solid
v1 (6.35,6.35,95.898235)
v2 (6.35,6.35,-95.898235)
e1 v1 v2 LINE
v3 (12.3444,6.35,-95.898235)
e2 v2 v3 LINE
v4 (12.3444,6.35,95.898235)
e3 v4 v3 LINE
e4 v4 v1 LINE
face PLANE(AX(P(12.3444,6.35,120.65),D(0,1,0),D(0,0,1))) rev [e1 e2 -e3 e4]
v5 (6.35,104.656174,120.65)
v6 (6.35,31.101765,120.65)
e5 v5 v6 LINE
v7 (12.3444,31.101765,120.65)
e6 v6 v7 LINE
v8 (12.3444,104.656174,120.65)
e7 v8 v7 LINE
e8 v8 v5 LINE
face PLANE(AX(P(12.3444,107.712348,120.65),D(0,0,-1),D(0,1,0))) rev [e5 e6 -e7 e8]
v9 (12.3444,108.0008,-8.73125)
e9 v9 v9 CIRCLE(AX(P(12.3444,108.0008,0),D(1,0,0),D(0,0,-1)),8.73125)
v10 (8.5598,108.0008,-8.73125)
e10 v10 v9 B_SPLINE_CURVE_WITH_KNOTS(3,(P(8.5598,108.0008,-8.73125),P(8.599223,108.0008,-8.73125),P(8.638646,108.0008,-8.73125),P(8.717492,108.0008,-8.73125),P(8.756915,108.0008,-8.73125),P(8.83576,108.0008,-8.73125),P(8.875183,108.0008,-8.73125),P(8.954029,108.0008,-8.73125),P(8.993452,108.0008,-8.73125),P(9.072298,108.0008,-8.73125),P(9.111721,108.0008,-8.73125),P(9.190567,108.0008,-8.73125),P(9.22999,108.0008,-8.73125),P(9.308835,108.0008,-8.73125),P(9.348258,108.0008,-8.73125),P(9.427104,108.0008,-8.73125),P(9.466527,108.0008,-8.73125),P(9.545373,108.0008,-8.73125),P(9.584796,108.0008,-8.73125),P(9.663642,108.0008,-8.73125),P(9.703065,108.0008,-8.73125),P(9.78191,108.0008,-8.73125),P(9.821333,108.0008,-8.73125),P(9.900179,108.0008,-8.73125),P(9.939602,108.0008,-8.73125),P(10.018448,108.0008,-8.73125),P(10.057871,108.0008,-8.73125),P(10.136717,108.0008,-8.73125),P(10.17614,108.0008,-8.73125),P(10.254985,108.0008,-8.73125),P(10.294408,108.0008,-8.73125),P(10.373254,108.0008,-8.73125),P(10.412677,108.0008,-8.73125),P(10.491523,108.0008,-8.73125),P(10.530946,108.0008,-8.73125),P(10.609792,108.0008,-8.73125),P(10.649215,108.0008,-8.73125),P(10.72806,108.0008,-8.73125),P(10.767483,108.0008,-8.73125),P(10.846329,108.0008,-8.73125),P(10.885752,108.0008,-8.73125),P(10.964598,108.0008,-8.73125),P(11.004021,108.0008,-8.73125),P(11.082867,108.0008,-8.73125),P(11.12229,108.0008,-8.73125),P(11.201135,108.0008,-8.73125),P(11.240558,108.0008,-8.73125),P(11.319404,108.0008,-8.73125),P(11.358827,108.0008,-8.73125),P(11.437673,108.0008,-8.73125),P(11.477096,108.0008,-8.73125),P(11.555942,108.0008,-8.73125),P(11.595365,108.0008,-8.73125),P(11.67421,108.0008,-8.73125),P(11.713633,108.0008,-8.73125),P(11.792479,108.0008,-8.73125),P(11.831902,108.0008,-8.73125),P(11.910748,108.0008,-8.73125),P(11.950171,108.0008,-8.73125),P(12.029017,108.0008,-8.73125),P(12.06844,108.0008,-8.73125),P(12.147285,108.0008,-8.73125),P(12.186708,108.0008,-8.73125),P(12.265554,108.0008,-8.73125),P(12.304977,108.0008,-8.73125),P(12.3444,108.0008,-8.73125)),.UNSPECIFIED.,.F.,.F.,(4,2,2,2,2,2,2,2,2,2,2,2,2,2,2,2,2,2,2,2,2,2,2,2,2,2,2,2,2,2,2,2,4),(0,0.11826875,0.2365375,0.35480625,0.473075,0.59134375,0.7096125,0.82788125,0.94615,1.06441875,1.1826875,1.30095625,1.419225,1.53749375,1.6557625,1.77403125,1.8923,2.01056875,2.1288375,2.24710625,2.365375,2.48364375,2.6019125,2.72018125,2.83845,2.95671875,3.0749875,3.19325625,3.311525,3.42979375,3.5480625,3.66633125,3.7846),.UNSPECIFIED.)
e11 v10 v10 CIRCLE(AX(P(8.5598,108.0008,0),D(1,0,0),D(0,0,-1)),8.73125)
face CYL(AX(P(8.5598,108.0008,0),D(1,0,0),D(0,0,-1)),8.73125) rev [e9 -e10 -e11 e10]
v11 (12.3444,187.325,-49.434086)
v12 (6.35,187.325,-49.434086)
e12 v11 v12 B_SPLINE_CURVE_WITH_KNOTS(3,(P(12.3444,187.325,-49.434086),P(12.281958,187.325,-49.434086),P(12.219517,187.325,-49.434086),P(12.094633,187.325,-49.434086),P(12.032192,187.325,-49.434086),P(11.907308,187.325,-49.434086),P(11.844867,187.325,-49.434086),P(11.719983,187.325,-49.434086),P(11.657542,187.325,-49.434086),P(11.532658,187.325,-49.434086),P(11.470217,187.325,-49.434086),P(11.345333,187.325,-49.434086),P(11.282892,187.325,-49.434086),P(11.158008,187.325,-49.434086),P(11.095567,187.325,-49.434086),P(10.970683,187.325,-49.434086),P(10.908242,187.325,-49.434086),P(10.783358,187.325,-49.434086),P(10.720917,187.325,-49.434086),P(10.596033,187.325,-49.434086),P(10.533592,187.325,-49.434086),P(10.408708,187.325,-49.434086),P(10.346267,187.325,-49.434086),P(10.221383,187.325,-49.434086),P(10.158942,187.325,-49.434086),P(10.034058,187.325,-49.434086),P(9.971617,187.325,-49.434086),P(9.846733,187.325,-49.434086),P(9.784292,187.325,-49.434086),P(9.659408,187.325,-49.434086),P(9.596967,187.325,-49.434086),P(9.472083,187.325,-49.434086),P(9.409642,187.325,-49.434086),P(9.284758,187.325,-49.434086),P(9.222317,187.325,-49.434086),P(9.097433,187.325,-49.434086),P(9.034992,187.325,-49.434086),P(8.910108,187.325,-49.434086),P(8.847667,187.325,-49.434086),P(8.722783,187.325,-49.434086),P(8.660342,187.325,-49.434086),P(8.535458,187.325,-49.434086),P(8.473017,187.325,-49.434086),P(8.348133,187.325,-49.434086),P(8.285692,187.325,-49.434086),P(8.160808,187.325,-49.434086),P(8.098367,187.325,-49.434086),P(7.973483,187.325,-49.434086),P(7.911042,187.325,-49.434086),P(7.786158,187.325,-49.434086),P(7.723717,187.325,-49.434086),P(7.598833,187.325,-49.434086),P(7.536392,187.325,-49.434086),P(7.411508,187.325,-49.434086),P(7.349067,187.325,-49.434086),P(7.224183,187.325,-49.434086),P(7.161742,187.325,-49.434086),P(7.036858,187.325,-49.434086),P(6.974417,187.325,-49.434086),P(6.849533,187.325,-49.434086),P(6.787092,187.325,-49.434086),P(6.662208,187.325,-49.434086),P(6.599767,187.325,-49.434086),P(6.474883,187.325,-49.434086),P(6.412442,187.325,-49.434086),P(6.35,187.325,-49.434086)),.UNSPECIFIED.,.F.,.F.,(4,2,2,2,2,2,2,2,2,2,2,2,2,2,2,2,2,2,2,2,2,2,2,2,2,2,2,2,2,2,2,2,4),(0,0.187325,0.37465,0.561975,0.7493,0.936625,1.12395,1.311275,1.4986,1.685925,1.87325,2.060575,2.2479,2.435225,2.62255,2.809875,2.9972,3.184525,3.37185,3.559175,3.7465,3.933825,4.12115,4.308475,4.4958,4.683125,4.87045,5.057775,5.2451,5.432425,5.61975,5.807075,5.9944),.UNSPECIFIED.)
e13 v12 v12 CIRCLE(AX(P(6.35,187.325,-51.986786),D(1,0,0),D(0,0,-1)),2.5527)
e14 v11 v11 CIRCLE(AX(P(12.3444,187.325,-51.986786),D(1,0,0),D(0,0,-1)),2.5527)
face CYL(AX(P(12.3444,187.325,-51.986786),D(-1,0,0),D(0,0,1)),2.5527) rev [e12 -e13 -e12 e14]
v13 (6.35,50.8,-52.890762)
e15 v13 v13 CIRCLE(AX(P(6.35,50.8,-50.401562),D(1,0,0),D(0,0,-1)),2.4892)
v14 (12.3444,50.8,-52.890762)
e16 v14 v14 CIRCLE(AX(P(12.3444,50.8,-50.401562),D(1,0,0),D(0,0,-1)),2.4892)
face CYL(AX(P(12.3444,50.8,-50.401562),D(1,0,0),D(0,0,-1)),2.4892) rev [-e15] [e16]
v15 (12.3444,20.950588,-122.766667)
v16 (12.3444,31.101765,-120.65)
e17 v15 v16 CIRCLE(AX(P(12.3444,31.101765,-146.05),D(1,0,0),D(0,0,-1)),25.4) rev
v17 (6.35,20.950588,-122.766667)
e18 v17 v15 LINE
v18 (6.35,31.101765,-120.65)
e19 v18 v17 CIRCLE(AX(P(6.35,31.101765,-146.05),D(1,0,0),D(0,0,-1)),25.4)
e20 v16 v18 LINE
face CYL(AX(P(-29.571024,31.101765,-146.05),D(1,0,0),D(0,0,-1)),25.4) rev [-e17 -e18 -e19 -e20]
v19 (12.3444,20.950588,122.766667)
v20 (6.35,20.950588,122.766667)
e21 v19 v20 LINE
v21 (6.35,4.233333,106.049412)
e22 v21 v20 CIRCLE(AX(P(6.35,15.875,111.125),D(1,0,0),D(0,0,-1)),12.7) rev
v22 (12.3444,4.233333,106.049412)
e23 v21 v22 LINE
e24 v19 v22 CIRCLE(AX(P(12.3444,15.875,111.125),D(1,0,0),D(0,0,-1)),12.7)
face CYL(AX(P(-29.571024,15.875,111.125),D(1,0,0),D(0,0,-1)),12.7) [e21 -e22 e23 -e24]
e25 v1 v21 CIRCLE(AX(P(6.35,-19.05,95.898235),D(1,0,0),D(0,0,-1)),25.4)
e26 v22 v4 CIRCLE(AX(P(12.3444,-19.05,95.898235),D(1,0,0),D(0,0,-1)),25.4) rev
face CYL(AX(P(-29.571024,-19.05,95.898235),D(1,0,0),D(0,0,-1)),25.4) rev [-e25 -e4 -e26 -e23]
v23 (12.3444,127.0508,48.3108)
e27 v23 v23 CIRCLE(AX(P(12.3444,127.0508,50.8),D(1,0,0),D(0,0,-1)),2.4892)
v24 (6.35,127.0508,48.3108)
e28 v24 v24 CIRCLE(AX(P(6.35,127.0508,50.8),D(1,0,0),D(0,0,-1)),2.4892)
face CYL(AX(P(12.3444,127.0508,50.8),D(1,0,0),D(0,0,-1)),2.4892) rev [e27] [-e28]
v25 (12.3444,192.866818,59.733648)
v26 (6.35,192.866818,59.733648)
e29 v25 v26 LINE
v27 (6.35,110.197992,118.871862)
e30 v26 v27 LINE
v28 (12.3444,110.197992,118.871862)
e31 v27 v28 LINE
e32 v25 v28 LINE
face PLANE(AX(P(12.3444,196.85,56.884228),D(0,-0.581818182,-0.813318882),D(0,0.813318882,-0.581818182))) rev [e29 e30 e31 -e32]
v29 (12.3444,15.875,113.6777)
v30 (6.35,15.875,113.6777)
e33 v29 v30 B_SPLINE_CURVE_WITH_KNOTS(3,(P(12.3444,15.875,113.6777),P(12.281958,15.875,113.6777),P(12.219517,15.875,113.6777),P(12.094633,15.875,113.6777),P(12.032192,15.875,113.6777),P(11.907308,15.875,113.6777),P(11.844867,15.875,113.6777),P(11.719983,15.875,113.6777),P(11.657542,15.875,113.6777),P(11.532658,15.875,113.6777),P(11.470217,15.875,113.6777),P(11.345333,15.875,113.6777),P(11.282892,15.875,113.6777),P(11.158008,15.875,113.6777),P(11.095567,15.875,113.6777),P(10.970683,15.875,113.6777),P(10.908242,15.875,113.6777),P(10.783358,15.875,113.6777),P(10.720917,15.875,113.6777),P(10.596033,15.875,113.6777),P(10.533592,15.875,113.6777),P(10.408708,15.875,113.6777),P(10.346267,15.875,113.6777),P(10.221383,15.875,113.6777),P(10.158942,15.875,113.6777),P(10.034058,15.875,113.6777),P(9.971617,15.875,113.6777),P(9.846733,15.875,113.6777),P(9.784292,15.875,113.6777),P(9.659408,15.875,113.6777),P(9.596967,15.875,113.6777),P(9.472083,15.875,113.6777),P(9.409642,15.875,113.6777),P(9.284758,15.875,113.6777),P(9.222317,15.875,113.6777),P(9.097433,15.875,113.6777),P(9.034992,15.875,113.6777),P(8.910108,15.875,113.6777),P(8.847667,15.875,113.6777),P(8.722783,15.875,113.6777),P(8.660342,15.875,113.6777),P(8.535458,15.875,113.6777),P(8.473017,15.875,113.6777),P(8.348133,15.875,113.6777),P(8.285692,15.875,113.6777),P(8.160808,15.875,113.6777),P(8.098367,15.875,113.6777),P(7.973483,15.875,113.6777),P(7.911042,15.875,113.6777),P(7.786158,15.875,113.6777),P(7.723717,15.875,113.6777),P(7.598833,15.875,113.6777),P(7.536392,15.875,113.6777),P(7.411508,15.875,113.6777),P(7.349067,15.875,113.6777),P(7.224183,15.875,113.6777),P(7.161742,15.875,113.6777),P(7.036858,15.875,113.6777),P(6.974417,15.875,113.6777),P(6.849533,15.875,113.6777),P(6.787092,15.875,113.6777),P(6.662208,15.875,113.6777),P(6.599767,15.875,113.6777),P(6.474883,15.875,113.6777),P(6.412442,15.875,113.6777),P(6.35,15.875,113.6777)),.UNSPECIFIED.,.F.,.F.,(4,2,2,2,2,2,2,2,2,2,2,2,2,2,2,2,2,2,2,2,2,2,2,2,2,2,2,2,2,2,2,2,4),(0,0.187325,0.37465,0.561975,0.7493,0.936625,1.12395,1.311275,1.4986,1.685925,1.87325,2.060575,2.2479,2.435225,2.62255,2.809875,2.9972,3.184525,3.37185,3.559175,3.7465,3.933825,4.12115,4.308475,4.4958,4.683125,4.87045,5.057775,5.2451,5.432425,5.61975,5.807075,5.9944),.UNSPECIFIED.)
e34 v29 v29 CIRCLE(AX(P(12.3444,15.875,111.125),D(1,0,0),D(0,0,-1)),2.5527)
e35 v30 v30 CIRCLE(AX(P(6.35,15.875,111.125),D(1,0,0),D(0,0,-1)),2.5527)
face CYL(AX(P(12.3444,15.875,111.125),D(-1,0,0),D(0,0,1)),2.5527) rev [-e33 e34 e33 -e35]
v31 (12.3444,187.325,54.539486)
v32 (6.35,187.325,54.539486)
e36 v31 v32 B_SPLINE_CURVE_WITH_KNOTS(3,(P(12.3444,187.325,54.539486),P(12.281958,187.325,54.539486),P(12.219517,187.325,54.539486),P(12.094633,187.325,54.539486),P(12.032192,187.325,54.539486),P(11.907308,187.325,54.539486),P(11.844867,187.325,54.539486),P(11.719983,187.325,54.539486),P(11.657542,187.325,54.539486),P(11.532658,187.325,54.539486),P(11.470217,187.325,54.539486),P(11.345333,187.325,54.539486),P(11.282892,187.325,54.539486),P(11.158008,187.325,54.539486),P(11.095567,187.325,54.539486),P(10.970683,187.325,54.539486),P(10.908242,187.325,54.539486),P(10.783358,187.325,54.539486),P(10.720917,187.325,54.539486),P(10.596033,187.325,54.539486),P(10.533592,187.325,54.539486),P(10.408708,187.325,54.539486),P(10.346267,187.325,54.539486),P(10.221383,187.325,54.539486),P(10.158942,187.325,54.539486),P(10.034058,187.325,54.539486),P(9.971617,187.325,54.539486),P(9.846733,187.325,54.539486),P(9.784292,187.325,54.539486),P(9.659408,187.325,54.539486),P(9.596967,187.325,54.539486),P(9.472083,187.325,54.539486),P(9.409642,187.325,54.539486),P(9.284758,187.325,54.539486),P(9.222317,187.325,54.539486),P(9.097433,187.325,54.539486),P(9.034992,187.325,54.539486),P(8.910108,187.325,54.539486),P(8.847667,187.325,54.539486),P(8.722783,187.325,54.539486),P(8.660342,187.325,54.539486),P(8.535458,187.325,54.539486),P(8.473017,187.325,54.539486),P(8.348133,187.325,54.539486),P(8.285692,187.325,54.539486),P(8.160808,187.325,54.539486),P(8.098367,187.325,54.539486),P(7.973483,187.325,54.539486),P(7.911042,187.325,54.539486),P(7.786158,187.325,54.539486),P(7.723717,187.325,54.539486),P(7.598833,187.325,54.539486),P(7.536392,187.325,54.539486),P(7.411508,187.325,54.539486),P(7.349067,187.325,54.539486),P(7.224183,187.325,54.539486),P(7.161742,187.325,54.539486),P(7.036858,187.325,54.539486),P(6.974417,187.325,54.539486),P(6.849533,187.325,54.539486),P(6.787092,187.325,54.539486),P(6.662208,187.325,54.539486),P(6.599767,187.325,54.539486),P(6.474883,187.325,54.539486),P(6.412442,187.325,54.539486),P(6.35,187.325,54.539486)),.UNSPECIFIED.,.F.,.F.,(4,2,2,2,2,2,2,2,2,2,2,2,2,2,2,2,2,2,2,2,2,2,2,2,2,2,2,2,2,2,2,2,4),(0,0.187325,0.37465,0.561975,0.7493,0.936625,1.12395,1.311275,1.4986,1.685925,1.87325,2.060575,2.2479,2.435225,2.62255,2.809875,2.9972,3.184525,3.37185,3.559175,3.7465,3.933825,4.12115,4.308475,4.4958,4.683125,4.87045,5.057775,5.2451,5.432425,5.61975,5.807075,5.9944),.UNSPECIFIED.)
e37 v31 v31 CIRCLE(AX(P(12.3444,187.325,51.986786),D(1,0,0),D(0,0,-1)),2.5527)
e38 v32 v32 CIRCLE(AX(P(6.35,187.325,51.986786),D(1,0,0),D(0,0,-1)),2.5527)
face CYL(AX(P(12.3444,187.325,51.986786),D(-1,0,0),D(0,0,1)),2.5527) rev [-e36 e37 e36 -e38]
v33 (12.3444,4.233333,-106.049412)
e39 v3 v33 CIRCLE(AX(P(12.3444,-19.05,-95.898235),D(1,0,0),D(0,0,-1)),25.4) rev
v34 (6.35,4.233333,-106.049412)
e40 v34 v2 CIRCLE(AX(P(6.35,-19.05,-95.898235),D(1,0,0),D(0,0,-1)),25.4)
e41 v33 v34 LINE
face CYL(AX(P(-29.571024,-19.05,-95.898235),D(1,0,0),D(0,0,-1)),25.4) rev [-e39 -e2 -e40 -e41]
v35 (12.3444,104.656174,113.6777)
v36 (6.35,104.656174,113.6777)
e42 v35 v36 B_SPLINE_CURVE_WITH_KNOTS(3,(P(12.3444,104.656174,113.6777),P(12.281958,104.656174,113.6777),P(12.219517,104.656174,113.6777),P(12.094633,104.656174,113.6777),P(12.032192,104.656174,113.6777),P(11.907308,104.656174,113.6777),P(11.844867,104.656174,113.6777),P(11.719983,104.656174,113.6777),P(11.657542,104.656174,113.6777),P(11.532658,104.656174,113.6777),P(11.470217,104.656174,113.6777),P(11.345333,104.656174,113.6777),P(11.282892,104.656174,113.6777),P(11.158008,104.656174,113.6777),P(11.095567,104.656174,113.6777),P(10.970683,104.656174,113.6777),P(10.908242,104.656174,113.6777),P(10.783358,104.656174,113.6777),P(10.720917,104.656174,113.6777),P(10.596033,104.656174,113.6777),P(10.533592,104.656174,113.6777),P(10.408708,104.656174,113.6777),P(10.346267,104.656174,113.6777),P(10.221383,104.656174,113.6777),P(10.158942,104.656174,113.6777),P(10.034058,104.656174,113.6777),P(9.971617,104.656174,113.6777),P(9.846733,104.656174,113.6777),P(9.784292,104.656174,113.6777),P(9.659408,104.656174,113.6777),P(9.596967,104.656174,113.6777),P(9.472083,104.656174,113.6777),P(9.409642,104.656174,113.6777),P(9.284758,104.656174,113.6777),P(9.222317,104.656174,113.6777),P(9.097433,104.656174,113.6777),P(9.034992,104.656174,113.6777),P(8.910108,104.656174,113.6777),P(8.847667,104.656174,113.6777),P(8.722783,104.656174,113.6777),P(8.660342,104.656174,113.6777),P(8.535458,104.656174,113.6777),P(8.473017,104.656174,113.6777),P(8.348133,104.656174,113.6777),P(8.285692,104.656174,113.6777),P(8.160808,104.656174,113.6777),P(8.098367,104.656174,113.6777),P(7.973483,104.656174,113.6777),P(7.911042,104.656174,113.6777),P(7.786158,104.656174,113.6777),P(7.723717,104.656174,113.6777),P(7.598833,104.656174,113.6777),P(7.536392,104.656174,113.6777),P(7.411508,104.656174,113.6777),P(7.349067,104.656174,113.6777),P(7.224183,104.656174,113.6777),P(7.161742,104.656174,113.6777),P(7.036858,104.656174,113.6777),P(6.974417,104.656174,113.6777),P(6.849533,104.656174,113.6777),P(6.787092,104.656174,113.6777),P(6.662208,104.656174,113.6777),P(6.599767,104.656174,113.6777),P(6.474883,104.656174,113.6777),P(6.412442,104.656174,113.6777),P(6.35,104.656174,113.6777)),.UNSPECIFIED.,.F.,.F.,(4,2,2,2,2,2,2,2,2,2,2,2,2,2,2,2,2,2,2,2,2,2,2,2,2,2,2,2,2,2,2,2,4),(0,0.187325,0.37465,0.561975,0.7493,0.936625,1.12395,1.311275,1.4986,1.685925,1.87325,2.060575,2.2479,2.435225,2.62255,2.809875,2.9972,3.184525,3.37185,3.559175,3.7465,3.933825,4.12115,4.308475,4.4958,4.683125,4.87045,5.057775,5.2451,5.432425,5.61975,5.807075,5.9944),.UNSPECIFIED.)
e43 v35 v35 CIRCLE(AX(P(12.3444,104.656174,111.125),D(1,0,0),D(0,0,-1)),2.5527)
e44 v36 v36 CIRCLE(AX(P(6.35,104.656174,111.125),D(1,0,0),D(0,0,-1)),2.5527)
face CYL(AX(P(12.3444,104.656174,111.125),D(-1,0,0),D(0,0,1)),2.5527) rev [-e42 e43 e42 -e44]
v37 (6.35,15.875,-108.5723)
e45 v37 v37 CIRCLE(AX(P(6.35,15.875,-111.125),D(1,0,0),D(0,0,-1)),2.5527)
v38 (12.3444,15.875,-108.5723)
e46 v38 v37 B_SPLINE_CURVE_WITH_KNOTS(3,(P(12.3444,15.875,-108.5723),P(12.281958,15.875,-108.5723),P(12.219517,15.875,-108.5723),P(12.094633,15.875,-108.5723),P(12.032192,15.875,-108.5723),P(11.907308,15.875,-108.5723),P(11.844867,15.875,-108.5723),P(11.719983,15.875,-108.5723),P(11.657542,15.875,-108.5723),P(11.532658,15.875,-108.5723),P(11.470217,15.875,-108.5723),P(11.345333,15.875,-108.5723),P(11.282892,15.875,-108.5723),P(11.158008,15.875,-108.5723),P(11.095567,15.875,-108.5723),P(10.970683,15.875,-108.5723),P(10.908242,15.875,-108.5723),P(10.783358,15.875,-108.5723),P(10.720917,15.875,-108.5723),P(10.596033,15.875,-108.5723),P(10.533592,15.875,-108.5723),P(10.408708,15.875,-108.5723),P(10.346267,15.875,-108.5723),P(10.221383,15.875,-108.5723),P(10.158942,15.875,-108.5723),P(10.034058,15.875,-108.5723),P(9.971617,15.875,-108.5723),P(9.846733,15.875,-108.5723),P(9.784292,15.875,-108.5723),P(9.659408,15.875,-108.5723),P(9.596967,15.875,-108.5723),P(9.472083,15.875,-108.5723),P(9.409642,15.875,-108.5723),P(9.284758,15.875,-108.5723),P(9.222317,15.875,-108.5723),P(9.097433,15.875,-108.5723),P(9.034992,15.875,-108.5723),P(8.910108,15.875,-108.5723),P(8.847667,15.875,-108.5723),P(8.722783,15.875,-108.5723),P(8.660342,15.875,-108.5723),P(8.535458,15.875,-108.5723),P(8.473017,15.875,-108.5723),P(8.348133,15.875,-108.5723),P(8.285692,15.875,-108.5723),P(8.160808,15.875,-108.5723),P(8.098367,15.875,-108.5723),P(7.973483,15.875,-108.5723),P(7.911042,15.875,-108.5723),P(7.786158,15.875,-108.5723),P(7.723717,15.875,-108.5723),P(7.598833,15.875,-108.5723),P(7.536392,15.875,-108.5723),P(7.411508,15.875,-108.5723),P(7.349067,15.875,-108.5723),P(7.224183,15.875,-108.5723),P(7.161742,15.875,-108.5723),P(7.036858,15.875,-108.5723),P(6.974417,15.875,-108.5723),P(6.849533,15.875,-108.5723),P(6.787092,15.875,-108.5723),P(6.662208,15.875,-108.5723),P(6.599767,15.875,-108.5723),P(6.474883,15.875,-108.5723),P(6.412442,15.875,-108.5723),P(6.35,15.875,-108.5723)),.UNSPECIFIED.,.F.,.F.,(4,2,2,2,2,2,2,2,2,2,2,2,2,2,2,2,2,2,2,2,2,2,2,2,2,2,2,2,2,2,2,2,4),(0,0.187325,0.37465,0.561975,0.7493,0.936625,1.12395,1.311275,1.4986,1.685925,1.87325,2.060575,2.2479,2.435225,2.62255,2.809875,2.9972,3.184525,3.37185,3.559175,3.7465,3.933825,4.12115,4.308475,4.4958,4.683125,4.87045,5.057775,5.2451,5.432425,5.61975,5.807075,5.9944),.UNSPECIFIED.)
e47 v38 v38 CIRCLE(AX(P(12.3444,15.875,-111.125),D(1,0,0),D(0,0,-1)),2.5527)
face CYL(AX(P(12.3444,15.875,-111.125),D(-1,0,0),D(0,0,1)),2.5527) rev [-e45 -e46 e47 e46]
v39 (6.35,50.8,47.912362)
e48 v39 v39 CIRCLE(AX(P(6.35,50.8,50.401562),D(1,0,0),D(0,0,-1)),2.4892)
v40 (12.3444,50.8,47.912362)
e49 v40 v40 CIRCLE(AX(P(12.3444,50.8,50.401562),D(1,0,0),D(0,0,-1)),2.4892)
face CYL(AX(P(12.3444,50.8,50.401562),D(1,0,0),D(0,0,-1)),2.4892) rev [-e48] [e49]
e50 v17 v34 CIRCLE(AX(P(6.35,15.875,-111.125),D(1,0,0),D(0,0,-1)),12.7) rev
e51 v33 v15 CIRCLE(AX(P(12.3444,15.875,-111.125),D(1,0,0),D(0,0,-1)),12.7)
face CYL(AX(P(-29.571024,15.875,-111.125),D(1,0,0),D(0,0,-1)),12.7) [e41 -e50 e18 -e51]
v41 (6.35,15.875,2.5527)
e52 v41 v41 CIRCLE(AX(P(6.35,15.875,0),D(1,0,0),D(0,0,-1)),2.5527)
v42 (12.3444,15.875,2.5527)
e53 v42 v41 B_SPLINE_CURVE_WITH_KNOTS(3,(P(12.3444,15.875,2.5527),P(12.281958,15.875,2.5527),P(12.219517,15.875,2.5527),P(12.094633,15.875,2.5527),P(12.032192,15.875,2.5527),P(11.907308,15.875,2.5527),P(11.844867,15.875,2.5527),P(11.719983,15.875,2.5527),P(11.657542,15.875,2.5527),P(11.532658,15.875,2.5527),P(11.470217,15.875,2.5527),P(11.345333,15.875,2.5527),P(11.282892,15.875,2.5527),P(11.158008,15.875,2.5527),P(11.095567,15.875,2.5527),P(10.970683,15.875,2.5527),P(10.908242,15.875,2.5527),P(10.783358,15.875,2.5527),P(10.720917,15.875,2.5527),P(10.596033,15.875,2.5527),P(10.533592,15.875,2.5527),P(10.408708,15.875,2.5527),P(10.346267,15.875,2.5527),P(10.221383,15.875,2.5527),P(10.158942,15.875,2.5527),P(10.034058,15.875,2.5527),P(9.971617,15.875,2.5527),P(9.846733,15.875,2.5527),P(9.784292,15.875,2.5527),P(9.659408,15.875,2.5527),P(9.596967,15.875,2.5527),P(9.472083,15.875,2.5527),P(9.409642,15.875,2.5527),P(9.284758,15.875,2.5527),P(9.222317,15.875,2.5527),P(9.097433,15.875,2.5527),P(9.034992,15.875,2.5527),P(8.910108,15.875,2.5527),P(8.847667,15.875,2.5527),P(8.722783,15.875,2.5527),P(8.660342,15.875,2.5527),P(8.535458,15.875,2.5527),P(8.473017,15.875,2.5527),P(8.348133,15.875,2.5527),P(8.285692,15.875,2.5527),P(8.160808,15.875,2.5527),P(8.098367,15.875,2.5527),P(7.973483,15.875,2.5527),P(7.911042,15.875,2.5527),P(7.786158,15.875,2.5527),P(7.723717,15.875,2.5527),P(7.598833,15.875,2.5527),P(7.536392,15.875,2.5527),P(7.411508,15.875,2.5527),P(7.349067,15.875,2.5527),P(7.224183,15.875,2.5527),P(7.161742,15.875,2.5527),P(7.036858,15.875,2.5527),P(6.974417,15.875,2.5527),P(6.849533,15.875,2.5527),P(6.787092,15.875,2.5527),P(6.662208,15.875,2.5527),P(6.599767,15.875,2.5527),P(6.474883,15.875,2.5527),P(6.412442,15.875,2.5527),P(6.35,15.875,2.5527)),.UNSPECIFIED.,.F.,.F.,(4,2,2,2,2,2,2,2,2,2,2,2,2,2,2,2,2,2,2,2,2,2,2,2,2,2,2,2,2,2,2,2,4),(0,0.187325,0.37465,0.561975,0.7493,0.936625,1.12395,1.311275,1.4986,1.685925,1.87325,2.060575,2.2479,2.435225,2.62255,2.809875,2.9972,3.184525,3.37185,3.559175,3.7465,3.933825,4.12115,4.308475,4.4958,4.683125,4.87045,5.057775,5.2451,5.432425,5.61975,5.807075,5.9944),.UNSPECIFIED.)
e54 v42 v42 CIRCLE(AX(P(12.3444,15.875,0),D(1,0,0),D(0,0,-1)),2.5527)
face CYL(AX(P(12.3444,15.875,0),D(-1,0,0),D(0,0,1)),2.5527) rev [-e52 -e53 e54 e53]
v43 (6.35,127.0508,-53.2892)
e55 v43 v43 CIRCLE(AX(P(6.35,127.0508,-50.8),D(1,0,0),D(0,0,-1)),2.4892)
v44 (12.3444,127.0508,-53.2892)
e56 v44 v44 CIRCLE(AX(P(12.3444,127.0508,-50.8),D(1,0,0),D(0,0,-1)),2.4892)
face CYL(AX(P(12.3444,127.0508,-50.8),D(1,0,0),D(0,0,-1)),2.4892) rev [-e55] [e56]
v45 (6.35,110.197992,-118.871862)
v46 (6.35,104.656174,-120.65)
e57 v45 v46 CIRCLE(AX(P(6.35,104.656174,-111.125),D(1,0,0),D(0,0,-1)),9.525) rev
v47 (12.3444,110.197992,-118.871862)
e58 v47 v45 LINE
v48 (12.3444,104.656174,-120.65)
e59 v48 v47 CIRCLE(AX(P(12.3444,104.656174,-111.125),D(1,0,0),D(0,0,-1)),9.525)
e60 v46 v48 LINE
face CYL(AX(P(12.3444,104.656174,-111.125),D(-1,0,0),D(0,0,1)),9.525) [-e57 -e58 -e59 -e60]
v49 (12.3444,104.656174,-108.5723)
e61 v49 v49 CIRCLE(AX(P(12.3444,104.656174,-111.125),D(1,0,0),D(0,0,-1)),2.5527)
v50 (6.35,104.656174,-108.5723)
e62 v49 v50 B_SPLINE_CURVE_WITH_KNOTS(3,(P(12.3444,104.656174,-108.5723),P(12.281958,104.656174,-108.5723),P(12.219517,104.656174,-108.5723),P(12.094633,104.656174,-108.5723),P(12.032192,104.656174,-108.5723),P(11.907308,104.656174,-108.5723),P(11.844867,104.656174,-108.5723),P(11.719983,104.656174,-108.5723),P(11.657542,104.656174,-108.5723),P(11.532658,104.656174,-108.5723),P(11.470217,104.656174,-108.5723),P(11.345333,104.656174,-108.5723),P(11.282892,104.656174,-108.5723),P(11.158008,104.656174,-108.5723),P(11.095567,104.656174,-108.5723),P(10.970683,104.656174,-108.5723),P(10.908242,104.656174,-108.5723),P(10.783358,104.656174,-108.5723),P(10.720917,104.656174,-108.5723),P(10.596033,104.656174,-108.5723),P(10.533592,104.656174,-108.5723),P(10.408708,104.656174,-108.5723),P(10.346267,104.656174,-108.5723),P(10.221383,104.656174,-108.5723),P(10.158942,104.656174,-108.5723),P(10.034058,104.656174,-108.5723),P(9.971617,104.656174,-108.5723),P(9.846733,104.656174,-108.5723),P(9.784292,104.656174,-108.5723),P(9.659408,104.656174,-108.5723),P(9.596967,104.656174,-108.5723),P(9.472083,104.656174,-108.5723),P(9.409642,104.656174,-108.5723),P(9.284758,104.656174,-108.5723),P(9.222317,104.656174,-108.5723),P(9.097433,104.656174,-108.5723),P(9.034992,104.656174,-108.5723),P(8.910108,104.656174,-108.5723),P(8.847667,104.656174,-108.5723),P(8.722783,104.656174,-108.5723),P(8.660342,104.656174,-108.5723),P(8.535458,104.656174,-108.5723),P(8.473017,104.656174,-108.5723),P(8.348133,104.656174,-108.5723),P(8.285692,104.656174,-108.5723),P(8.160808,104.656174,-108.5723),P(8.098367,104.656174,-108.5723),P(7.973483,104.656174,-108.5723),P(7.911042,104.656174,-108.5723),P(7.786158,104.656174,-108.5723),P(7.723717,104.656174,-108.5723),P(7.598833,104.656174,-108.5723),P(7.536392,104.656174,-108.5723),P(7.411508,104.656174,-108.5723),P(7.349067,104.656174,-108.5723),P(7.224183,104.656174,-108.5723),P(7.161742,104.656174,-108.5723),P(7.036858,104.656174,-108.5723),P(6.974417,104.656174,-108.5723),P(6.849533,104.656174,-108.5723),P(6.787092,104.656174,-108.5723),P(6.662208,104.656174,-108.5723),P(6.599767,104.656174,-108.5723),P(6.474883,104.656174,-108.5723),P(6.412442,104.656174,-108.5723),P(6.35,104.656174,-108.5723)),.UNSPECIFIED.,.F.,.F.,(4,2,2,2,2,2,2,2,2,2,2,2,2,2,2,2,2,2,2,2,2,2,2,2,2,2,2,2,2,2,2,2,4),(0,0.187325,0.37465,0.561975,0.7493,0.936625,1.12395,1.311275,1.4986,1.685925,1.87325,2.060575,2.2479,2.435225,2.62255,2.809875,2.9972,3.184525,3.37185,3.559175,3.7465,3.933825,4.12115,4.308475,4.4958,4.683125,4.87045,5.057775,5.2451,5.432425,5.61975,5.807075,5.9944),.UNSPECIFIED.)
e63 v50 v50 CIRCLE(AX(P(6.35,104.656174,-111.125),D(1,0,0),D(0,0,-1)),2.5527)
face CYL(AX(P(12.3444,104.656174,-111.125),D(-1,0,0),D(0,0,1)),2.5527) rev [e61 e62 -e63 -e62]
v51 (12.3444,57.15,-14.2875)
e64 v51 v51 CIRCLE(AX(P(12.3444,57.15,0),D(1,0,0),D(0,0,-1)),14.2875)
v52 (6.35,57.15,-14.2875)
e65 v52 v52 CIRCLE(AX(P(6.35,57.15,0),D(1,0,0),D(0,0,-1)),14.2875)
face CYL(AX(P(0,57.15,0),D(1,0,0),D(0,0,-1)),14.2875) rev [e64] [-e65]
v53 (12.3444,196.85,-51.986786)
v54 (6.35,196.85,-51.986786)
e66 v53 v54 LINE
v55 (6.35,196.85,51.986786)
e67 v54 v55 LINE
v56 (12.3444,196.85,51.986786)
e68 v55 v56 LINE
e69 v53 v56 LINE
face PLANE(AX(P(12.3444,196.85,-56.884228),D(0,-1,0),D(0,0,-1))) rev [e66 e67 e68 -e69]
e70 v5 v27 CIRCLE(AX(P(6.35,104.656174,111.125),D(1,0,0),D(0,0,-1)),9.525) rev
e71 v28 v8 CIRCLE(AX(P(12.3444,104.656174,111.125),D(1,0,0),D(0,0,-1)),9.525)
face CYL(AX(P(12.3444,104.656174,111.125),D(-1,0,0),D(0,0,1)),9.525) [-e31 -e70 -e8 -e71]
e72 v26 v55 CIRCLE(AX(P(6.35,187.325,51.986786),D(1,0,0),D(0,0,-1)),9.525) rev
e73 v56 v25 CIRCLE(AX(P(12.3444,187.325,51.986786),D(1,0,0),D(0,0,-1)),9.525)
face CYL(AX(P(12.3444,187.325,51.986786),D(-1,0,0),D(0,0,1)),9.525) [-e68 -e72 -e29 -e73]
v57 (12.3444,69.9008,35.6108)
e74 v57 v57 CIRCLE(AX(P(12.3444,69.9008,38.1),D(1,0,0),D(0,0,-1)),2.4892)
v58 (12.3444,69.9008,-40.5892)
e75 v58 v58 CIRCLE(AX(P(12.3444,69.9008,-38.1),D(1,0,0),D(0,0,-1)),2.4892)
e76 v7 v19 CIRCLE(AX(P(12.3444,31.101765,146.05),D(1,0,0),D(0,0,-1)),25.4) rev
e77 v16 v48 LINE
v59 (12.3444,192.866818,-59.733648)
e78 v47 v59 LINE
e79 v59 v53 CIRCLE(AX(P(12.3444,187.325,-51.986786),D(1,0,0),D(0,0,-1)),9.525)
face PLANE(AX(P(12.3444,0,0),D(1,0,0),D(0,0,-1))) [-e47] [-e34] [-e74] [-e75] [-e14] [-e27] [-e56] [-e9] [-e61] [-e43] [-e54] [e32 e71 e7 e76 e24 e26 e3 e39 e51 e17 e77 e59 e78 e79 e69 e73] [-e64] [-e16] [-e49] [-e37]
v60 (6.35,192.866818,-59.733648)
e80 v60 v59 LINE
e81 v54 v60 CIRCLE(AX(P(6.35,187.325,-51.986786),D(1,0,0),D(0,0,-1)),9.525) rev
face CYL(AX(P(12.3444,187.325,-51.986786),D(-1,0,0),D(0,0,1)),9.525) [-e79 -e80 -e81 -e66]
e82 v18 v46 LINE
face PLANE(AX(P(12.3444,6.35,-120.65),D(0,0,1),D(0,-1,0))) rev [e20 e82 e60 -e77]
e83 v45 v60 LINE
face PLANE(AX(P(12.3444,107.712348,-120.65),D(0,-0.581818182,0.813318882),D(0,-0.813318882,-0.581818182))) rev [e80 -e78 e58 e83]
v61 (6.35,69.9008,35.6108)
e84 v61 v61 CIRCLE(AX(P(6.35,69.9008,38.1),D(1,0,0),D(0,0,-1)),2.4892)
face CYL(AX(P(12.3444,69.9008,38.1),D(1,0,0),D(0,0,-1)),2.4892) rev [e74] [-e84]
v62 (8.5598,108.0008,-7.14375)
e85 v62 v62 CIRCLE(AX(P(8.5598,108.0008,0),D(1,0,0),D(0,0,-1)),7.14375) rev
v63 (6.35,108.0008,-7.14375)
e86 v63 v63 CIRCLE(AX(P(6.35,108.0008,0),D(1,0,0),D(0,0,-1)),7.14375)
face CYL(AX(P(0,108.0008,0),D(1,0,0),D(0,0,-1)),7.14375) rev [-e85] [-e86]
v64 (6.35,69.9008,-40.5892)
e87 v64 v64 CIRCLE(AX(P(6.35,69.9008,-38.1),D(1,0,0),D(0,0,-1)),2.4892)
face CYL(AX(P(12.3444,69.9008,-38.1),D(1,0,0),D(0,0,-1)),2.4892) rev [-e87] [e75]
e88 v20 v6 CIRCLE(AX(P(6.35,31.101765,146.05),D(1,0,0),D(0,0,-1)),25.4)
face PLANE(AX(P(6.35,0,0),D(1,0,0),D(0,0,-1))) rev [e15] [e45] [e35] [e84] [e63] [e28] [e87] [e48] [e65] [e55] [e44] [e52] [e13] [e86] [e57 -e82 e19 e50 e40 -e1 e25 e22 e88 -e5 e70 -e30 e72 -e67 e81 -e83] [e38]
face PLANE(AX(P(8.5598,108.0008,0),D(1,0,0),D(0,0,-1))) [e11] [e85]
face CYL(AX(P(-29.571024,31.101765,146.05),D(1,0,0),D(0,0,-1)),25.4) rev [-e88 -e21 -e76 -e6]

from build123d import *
from build123d.topology import SkipClean

# Parameters (mm, degrees)
ANGLEDBALLAST_DECKFRONT_OUTLINE_R = 2.5527
ANGLEDBALLAST_DECKFRONT_DEPTH     = 6.35
SKETCH1_R                         = 2.5527
BOSS_EXTRUDE1_DEPTH               = 5.9944
SKETCH2_R                         = 7.14375
SKETCH2_R_2                       = 14.2875
CUT_EXTRUDE1_DEPTH                = 344.885135927
F_10_CLEARANCE_HOLE1_AT_2_COUNT   = 2
F_10_CLEARANCE_HOLE1_AT_2_PITCH   = 58.544107304
F_10_CLEARANCE_HOLE1_AT_3_COUNT   = 2
F_10_CLEARANCE_HOLE1_AT_3_PITCH   = 105.685062805
F_10_CLEARANCE_HOLE1_AT_4_COUNT   = 2
F_10_CLEARANCE_HOLE1_AT_4_PITCH   = 76.2
F_10_CLEARANCE_HOLE1_AT_5_COUNT   = 2
F_10_CLEARANCE_HOLE1_AT_5_PITCH   = 90.539312574
F_10_CLEARANCE_HOLE1_AT_6_COUNT   = 2
F_10_CLEARANCE_HOLE1_AT_6_PITCH   = 22.719352983
SKETCH6_R                         = 12.7
SKETCH6_R_2                       = 2.5527
BOSS_EXTRUDE2_DEPTH               = 5.9944
FILLET1_R                         = 25.4
CUT_EXTRUDE2_DEPTH                = 233.633802265
FILLET2_R                         = 9.525
SKETCH8_R                         = 8.73125
CUT_EXTRUDE3_DEPTH                = 3.7846


# Read off the part's stored shape, not the designer's step: Surface Bodies1
with BuildPart() as part:
    # AngledBallast_DeckFront outline → AngledBallast_DeckFront (new body)
    with BuildSketch(Plane.YZ):
        Polygon((227.241295543, 95.25), (0, 257.81), (0, -257.81), (227.241295543, -95.25), align=None)
        with Locations((15.875, -111.125)):
            Circle(ANGLEDBALLAST_DECKFRONT_OUTLINE_R, mode=Mode.SUBTRACT)
        with Locations((104.656174089, -111.125)):
            Circle(ANGLEDBALLAST_DECKFRONT_OUTLINE_R, mode=Mode.SUBTRACT)
        with Locations((187.325, -51.986786112)):
            Circle(ANGLEDBALLAST_DECKFRONT_OUTLINE_R, mode=Mode.SUBTRACT)
        with Locations((15.875, 0)):
            Circle(ANGLEDBALLAST_DECKFRONT_OUTLINE_R, mode=Mode.SUBTRACT)
        with Locations((15.875, 111.125)):
            Circle(ANGLEDBALLAST_DECKFRONT_OUTLINE_R, mode=Mode.SUBTRACT)
        Polygon((101.6, -101.6), (25.4, -101.6), (25.4, 101.6), (101.6, 101.6), (177.8, 47.089344398), (177.8, -47.089344398), align=None, mode=Mode.SUBTRACT)
        with Locations((104.656174089, 111.125)):
            Circle(ANGLEDBALLAST_DECKFRONT_OUTLINE_R, mode=Mode.SUBTRACT)
        with Locations((187.325, 51.986786112)):
            Circle(ANGLEDBALLAST_DECKFRONT_OUTLINE_R, mode=Mode.SUBTRACT)
    extrude(amount=ANGLEDBALLAST_DECKFRONT_DEPTH)


with BuildPart() as body_2:
    # Sketch1 → Boss-Extrude1 (new body)
    with BuildSketch(Plane(origin=(6.35, 0, 0), x_dir=(0, 0, -1), z_dir=(1, 0, 0))):
        Polygon((120.65, 107.712348179), (56.884227826, 196.85), (-56.884227826, 196.85), (-120.65, 107.712348179), (-120.65, 6.35), (120.65, 6.35), align=None)
        with Locations(Location((51.986786112, 187.325, 0), (0, 0, 180))):
            Circle(SKETCH1_R, mode=Mode.SUBTRACT)
        with Locations(Location((111.125, 104.656174089, 0), (0, 0, 180))):
            Circle(SKETCH1_R, mode=Mode.SUBTRACT)
        with Locations(Location((0, 15.875, 0), (0, 0, 180))):
            Circle(SKETCH1_R, mode=Mode.SUBTRACT)
        with Locations(Location((111.125, 15.875, 0), (0, 0, 180))):
            Circle(SKETCH1_R, mode=Mode.SUBTRACT)
        with Locations(Location((-111.125, 15.875, 0), (0, 0, 180))):
            Circle(SKETCH1_R, mode=Mode.SUBTRACT)
        with Locations(Location((-111.125, 104.656174089, 0), (0, 0, 180))):
            Circle(SKETCH1_R, mode=Mode.SUBTRACT)
        with Locations(Location((-51.986786112, 187.325, 0), (0, 0, 180))):
            Circle(SKETCH1_R, mode=Mode.SUBTRACT)
    extrude(amount=BOSS_EXTRUDE1_DEPTH)

    # Sketch2 → Cut-Extrude1 (cut, through all)
    with BuildSketch(Plane(origin=(12.3444, 0, 0), x_dir=(0, 0, -1), z_dir=(1, 0, 0))):
        with Locations((0, 108.0008)):
            Circle(SKETCH2_R)
        with Locations((0, 57.15)):
            Circle(SKETCH2_R_2)
    extrude(amount=-CUT_EXTRUDE1_DEPTH, mode=Mode.SUBTRACT)

    # Sketch5 → #10 Clearance Hole1 (revolve, cut)
    with BuildSketch(Plane(origin=(12.3444, 69.9008, -38.1), x_dir=(0, 0, -1), z_dir=(0, 1, 0))):
        Polygon((0, 0), (0, 13.433662253), (2.4892, 11.938), (2.4892, 0), align=None)
    f_10_clearance_hole1 = revolve(axis=Axis((18.6944, 69.9008, -38.1), (-1, 0, 0)), mode=Mode.SUBTRACT)

    # #10 Clearance Hole1 at 2: #10 Clearance Hole1 ×2
    with Locations(*[Vector(0, 0.9761870601839528, -0.2169304578186562) * (i * F_10_CLEARANCE_HOLE1_AT_2_PITCH) for i in range(1, F_10_CLEARANCE_HOLE1_AT_2_COUNT)]):
        add(f_10_clearance_hole1, mode=Mode.SUBTRACT)

    # #10 Clearance Hole1 at 3: #10 Clearance Hole1 ×2
    with Locations(*[Vector(0, 0.5407575913134985, 0.8411784753765537) * (i * F_10_CLEARANCE_HOLE1_AT_3_PITCH) for i in range(1, F_10_CLEARANCE_HOLE1_AT_3_COUNT)]):
        add(f_10_clearance_hole1, mode=Mode.SUBTRACT)

    # #10 Clearance Hole1 at 4: #10 Clearance Hole1 ×2
    with Locations(*[(0, 0, i * F_10_CLEARANCE_HOLE1_AT_4_PITCH) for i in range(1, F_10_CLEARANCE_HOLE1_AT_4_COUNT)]):
        add(f_10_clearance_hole1, mode=Mode.SUBTRACT)

    # #10 Clearance Hole1 at 5: #10 Clearance Hole1 ×2
    with Locations(*[Vector(0, -0.2109669209657333, 0.9774932011314648) * (i * F_10_CLEARANCE_HOLE1_AT_5_PITCH) for i in range(1, F_10_CLEARANCE_HOLE1_AT_5_COUNT)]):
        add(f_10_clearance_hole1, mode=Mode.SUBTRACT)

    # #10 Clearance Hole1 at 6: #10 Clearance Hole1 ×2
    with Locations(*[Vector(0, -0.8407281674761526, -0.5414574299168776) * (i * F_10_CLEARANCE_HOLE1_AT_6_PITCH) for i in range(1, F_10_CLEARANCE_HOLE1_AT_6_COUNT)]):
        add(f_10_clearance_hole1, mode=Mode.SUBTRACT)

    # Sketch6 → Boss-Extrude2 (add)
    # profile 1 of 2: a face of its own
    with BuildSketch(Plane(origin=(12.3444, 0, 0), x_dir=(0, 0, -1), z_dir=(1, 0, 0))):
        with Locations((-111.125, 15.875)):
            Circle(SKETCH6_R)
        with Locations(Location((-111.125, 15.875, 0), (0, 0, 180))):
            Circle(SKETCH6_R_2, mode=Mode.SUBTRACT)
    # profile 2 of 2: a face of its own
    with BuildSketch(Plane(origin=(12.3444, 0, 0), x_dir=(0, 0, -1), z_dir=(1, 0, 0))):
        with Locations((111.125, 15.875)):
            Circle(SKETCH6_R)
        with Locations(Location((111.125, 15.875, 0), (0, 0, 180))):
            Circle(SKETCH6_R_2, mode=Mode.SUBTRACT)
    extrude(amount=-BOSS_EXTRUDE2_DEPTH)

    # Fillet1
    fillet1_edges = [body_2.edges().sort_by_distance(p)[0] for p in [
        (9.3472, 6.35, 102.724739587),
        (9.3472, 24.275260413, 120.65),
        (9.3472, 6.35, -102.724739587),
        (9.3472, 24.275260413, -120.65),
    ]]
    fillet(fillet1_edges, radius=FILLET1_R)

    # Sketch7 → Cut-Extrude2 (cut, through all)
    with BuildSketch(Plane(origin=(12.3444, 0, 0), x_dir=(0, 0, -1), z_dir=(1, 0, 0))):
        with BuildLine():
            Line((119.525260413, 6.35), (120.65, 6.35))
            Line((120.65, 6.35), (120.65, 7.474739587))
            ThreePointArc((120.65, 7.474739587), (120.105256121, 6.894743879), (119.525260413, 6.35))
        make_face()
        with BuildLine():
            Line((-120.65, 6.35), (-119.525260413, 6.35))
            ThreePointArc((-119.525260413, 6.35), (-120.105256121, 6.894743879), (-120.65, 7.474739587))
            Line((-120.65, 7.474739587), (-120.65, 6.35))
        make_face()
    extrude(amount=-CUT_EXTRUDE2_DEPTH, mode=Mode.SUBTRACT)

    # Fillet2
    fillet2_edges = [body_2.edges().sort_by_distance(p)[0] for p in [
        (9.3472, 107.712348179, 120.65),
        (9.3472, 196.85, 56.884227826),
        (9.3472, 196.85, -56.884227826),
        (9.3472, 107.712348179, -120.65),
    ]]
    fillet(fillet2_edges, radius=FILLET2_R)

    # Sketch8 → Cut-Extrude3 (cut)
    with SkipClean():  # the faces are left unmerged after this step: merging them gives an invalid solid
        with BuildSketch(Plane(origin=(12.3444, 0, 0), x_dir=(0, 0, -1), z_dir=(1, 0, 0))):
            with Locations((0, 108.0008)):
                Circle(SKETCH8_R)
        extrude(amount=-CUT_EXTRUDE3_DEPTH, mode=Mode.SUBTRACT)


solid = body_2.part
